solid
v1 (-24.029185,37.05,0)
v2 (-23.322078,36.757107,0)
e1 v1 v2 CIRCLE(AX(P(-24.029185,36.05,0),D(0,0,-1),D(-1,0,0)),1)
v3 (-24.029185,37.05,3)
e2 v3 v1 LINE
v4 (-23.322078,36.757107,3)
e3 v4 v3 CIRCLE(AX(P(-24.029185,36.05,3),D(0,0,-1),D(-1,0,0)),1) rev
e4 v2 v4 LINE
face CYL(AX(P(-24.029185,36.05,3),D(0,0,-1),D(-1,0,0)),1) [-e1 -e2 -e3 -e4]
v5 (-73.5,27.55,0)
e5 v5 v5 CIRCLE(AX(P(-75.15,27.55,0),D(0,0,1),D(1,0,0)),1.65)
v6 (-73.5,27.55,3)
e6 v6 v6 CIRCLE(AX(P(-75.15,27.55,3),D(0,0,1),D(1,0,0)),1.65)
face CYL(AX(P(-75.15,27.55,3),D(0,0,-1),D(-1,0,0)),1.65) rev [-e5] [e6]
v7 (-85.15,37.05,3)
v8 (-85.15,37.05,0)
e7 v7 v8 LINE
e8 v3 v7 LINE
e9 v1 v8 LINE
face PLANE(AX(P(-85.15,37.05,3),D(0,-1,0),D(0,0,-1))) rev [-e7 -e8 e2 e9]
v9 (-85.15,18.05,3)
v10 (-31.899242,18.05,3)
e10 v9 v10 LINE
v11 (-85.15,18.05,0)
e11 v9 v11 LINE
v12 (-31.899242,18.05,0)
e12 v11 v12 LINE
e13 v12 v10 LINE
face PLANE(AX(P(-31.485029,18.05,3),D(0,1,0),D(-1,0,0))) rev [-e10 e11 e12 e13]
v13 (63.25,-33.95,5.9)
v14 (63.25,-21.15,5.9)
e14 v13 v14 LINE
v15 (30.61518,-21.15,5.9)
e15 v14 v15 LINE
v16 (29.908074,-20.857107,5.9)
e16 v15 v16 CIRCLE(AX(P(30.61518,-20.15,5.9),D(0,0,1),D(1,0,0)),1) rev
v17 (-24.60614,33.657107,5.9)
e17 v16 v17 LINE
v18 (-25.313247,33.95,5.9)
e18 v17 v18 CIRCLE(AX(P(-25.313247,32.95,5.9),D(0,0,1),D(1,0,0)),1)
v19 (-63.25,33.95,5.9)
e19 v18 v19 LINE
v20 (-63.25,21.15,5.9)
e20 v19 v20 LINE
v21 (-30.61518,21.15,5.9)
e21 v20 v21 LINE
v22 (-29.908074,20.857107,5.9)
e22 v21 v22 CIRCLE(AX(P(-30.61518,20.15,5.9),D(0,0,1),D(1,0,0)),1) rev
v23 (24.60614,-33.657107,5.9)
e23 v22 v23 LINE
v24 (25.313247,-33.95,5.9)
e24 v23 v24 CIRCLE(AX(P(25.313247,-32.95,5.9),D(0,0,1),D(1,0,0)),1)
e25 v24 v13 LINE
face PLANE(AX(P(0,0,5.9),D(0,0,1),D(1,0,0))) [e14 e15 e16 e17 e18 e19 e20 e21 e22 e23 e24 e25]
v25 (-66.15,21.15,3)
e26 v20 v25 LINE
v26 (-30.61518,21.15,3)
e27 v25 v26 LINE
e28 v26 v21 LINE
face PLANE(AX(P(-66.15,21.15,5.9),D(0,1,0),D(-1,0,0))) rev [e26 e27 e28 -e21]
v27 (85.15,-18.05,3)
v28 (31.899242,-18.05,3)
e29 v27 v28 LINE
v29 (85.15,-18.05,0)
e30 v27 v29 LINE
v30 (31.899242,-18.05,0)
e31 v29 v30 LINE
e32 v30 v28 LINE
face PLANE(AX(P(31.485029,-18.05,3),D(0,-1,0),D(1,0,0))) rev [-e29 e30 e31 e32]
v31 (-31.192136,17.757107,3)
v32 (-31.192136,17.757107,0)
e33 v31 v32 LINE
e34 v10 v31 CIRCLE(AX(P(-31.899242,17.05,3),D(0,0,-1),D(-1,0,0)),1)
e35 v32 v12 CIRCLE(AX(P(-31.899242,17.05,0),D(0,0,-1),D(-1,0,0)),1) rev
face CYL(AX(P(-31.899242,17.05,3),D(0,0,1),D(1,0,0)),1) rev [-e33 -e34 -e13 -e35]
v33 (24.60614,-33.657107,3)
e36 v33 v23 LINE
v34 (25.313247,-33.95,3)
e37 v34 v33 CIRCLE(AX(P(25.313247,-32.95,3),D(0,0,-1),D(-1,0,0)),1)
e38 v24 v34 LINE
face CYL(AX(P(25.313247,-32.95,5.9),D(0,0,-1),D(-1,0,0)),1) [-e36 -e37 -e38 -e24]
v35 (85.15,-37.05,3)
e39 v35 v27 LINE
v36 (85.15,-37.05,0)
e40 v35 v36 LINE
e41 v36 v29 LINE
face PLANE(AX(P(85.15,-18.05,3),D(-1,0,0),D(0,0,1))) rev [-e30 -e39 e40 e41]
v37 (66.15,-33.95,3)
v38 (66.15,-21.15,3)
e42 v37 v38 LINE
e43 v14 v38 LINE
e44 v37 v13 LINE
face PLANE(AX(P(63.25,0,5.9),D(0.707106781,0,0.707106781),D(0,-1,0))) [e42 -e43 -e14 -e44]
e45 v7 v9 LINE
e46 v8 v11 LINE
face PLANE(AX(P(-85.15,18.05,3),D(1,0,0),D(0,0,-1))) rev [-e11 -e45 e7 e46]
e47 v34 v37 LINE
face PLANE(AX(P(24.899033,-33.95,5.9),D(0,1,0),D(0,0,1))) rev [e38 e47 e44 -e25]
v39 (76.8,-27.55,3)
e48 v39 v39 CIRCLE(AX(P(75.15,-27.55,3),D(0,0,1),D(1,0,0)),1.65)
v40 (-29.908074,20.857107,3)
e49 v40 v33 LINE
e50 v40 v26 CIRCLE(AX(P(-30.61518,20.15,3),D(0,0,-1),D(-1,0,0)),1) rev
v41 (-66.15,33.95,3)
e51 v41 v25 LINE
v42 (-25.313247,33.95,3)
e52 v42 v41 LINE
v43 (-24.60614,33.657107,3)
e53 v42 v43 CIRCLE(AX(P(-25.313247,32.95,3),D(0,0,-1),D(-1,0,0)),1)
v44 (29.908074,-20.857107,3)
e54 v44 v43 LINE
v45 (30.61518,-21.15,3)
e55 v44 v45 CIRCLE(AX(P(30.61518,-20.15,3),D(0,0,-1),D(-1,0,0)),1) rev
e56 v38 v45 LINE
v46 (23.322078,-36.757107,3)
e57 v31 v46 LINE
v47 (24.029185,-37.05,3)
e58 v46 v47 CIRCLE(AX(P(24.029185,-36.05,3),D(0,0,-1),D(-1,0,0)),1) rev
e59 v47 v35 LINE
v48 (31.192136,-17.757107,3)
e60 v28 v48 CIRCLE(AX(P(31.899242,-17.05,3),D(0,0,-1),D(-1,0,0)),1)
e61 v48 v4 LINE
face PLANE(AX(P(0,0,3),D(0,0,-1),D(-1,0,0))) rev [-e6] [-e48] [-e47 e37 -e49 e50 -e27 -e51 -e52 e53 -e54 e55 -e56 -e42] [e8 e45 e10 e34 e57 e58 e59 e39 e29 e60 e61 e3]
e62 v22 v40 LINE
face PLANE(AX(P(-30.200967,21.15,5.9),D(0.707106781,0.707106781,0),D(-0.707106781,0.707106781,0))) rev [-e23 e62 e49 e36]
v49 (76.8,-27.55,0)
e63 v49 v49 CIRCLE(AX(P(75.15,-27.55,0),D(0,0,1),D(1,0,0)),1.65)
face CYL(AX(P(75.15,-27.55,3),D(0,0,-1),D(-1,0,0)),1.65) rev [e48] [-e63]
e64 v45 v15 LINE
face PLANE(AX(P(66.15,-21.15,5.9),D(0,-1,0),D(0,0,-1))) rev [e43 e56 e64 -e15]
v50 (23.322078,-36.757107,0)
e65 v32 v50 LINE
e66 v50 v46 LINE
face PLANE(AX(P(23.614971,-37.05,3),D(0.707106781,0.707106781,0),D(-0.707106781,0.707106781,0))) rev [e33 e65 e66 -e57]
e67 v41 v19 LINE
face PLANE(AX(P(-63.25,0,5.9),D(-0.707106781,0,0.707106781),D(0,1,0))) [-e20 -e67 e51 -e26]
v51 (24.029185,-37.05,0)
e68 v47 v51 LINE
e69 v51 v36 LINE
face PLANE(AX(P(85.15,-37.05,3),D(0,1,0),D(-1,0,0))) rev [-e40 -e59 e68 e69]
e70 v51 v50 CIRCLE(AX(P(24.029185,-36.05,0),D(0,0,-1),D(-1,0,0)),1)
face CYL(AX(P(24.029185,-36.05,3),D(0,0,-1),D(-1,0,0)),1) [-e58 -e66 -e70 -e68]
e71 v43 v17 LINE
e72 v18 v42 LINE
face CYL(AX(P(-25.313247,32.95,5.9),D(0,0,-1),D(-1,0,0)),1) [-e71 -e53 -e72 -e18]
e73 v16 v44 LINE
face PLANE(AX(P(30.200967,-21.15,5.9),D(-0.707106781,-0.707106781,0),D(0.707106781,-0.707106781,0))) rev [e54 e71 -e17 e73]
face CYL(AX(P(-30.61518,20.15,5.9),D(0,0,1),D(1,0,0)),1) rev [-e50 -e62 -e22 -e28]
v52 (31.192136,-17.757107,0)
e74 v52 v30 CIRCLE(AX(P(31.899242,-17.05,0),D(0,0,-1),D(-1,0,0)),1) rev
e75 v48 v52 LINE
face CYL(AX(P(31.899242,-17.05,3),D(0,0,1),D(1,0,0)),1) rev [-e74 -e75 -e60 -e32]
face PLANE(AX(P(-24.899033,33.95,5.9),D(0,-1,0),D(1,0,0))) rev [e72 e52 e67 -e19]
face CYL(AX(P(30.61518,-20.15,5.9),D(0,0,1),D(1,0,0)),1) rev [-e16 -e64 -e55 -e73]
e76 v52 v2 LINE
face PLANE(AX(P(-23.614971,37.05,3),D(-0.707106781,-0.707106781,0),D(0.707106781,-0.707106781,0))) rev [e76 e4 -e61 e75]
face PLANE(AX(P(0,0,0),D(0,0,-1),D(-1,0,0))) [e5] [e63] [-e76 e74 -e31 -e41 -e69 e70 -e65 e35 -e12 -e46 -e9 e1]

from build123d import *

# Parameters (mm, degrees)
SKETCH_1_R      = 1.65
EXTRUDE_1_DEPTH = 3
EXTRUDE_2_DEPTH = 2.9
CHAMFER_1_SIZE  = 2.9
FILLET_1_R      = 1


with BuildPart() as part:
    # 草图1 → 凸台-拉伸1 (new body)
    with BuildSketch(Plane.XY):
        Polygon((-85.15, 37.05), (-23.614971157, 37.05), (31.485028843, -18.05), (85.15, -18.05), (85.15, -37.05), (23.614971157, -37.05), (-31.485028843, 18.05), (-85.15, 18.05), align=None)
        with Locations((-75.15, 27.55)):
            Circle(SKETCH_1_R, mode=Mode.SUBTRACT)
        with Locations((75.15, -27.55)):
            Circle(SKETCH_1_R, mode=Mode.SUBTRACT)
    extrude(amount=EXTRUDE_1_DEPTH)

    # 草图2 → 凸台-拉伸2 (add)
    with BuildSketch(Plane.XY.offset(3)):
        Polygon((-66.15, 33.95), (-66.15, 21.15), (-30.200966799, 21.15), (24.899033201, -33.95), (66.15, -33.95), (66.15, -21.15), (30.200966799, -21.15), (-24.899033201, 33.95), align=None)
    extrude(amount=EXTRUDE_2_DEPTH)

    # 倒角1
    chamfer_1_edges = [part.edges().sort_by_distance(p)[0] for p in [
        (66.15, -27.55, 5.9),
        (-66.15, 27.55, 5.9),
    ]]
    chamfer(chamfer_1_edges, length=CHAMFER_1_SIZE - 0.0001)  # a hair under: the kernel refuses the full size

    # 圆角1
    fillet_1_edges = [part.edges().sort_by_distance(p)[0] for p in [
        (-23.614971157, 37.05, 1.5),
        (31.485028843, -18.05, 1.5),
        (23.614971157, -37.05, 1.5),
        (-31.485028843, 18.05, 1.5),
        (-24.899033201, 33.95, 4.45),
        (-30.200966799, 21.15, 4.45),
        (24.899033201, -33.95, 4.45),
        (30.200966799, -21.15, 4.45),
    ]]
    fillet(fillet_1_edges, radius=FILLET_1_R)


solid = part.part
